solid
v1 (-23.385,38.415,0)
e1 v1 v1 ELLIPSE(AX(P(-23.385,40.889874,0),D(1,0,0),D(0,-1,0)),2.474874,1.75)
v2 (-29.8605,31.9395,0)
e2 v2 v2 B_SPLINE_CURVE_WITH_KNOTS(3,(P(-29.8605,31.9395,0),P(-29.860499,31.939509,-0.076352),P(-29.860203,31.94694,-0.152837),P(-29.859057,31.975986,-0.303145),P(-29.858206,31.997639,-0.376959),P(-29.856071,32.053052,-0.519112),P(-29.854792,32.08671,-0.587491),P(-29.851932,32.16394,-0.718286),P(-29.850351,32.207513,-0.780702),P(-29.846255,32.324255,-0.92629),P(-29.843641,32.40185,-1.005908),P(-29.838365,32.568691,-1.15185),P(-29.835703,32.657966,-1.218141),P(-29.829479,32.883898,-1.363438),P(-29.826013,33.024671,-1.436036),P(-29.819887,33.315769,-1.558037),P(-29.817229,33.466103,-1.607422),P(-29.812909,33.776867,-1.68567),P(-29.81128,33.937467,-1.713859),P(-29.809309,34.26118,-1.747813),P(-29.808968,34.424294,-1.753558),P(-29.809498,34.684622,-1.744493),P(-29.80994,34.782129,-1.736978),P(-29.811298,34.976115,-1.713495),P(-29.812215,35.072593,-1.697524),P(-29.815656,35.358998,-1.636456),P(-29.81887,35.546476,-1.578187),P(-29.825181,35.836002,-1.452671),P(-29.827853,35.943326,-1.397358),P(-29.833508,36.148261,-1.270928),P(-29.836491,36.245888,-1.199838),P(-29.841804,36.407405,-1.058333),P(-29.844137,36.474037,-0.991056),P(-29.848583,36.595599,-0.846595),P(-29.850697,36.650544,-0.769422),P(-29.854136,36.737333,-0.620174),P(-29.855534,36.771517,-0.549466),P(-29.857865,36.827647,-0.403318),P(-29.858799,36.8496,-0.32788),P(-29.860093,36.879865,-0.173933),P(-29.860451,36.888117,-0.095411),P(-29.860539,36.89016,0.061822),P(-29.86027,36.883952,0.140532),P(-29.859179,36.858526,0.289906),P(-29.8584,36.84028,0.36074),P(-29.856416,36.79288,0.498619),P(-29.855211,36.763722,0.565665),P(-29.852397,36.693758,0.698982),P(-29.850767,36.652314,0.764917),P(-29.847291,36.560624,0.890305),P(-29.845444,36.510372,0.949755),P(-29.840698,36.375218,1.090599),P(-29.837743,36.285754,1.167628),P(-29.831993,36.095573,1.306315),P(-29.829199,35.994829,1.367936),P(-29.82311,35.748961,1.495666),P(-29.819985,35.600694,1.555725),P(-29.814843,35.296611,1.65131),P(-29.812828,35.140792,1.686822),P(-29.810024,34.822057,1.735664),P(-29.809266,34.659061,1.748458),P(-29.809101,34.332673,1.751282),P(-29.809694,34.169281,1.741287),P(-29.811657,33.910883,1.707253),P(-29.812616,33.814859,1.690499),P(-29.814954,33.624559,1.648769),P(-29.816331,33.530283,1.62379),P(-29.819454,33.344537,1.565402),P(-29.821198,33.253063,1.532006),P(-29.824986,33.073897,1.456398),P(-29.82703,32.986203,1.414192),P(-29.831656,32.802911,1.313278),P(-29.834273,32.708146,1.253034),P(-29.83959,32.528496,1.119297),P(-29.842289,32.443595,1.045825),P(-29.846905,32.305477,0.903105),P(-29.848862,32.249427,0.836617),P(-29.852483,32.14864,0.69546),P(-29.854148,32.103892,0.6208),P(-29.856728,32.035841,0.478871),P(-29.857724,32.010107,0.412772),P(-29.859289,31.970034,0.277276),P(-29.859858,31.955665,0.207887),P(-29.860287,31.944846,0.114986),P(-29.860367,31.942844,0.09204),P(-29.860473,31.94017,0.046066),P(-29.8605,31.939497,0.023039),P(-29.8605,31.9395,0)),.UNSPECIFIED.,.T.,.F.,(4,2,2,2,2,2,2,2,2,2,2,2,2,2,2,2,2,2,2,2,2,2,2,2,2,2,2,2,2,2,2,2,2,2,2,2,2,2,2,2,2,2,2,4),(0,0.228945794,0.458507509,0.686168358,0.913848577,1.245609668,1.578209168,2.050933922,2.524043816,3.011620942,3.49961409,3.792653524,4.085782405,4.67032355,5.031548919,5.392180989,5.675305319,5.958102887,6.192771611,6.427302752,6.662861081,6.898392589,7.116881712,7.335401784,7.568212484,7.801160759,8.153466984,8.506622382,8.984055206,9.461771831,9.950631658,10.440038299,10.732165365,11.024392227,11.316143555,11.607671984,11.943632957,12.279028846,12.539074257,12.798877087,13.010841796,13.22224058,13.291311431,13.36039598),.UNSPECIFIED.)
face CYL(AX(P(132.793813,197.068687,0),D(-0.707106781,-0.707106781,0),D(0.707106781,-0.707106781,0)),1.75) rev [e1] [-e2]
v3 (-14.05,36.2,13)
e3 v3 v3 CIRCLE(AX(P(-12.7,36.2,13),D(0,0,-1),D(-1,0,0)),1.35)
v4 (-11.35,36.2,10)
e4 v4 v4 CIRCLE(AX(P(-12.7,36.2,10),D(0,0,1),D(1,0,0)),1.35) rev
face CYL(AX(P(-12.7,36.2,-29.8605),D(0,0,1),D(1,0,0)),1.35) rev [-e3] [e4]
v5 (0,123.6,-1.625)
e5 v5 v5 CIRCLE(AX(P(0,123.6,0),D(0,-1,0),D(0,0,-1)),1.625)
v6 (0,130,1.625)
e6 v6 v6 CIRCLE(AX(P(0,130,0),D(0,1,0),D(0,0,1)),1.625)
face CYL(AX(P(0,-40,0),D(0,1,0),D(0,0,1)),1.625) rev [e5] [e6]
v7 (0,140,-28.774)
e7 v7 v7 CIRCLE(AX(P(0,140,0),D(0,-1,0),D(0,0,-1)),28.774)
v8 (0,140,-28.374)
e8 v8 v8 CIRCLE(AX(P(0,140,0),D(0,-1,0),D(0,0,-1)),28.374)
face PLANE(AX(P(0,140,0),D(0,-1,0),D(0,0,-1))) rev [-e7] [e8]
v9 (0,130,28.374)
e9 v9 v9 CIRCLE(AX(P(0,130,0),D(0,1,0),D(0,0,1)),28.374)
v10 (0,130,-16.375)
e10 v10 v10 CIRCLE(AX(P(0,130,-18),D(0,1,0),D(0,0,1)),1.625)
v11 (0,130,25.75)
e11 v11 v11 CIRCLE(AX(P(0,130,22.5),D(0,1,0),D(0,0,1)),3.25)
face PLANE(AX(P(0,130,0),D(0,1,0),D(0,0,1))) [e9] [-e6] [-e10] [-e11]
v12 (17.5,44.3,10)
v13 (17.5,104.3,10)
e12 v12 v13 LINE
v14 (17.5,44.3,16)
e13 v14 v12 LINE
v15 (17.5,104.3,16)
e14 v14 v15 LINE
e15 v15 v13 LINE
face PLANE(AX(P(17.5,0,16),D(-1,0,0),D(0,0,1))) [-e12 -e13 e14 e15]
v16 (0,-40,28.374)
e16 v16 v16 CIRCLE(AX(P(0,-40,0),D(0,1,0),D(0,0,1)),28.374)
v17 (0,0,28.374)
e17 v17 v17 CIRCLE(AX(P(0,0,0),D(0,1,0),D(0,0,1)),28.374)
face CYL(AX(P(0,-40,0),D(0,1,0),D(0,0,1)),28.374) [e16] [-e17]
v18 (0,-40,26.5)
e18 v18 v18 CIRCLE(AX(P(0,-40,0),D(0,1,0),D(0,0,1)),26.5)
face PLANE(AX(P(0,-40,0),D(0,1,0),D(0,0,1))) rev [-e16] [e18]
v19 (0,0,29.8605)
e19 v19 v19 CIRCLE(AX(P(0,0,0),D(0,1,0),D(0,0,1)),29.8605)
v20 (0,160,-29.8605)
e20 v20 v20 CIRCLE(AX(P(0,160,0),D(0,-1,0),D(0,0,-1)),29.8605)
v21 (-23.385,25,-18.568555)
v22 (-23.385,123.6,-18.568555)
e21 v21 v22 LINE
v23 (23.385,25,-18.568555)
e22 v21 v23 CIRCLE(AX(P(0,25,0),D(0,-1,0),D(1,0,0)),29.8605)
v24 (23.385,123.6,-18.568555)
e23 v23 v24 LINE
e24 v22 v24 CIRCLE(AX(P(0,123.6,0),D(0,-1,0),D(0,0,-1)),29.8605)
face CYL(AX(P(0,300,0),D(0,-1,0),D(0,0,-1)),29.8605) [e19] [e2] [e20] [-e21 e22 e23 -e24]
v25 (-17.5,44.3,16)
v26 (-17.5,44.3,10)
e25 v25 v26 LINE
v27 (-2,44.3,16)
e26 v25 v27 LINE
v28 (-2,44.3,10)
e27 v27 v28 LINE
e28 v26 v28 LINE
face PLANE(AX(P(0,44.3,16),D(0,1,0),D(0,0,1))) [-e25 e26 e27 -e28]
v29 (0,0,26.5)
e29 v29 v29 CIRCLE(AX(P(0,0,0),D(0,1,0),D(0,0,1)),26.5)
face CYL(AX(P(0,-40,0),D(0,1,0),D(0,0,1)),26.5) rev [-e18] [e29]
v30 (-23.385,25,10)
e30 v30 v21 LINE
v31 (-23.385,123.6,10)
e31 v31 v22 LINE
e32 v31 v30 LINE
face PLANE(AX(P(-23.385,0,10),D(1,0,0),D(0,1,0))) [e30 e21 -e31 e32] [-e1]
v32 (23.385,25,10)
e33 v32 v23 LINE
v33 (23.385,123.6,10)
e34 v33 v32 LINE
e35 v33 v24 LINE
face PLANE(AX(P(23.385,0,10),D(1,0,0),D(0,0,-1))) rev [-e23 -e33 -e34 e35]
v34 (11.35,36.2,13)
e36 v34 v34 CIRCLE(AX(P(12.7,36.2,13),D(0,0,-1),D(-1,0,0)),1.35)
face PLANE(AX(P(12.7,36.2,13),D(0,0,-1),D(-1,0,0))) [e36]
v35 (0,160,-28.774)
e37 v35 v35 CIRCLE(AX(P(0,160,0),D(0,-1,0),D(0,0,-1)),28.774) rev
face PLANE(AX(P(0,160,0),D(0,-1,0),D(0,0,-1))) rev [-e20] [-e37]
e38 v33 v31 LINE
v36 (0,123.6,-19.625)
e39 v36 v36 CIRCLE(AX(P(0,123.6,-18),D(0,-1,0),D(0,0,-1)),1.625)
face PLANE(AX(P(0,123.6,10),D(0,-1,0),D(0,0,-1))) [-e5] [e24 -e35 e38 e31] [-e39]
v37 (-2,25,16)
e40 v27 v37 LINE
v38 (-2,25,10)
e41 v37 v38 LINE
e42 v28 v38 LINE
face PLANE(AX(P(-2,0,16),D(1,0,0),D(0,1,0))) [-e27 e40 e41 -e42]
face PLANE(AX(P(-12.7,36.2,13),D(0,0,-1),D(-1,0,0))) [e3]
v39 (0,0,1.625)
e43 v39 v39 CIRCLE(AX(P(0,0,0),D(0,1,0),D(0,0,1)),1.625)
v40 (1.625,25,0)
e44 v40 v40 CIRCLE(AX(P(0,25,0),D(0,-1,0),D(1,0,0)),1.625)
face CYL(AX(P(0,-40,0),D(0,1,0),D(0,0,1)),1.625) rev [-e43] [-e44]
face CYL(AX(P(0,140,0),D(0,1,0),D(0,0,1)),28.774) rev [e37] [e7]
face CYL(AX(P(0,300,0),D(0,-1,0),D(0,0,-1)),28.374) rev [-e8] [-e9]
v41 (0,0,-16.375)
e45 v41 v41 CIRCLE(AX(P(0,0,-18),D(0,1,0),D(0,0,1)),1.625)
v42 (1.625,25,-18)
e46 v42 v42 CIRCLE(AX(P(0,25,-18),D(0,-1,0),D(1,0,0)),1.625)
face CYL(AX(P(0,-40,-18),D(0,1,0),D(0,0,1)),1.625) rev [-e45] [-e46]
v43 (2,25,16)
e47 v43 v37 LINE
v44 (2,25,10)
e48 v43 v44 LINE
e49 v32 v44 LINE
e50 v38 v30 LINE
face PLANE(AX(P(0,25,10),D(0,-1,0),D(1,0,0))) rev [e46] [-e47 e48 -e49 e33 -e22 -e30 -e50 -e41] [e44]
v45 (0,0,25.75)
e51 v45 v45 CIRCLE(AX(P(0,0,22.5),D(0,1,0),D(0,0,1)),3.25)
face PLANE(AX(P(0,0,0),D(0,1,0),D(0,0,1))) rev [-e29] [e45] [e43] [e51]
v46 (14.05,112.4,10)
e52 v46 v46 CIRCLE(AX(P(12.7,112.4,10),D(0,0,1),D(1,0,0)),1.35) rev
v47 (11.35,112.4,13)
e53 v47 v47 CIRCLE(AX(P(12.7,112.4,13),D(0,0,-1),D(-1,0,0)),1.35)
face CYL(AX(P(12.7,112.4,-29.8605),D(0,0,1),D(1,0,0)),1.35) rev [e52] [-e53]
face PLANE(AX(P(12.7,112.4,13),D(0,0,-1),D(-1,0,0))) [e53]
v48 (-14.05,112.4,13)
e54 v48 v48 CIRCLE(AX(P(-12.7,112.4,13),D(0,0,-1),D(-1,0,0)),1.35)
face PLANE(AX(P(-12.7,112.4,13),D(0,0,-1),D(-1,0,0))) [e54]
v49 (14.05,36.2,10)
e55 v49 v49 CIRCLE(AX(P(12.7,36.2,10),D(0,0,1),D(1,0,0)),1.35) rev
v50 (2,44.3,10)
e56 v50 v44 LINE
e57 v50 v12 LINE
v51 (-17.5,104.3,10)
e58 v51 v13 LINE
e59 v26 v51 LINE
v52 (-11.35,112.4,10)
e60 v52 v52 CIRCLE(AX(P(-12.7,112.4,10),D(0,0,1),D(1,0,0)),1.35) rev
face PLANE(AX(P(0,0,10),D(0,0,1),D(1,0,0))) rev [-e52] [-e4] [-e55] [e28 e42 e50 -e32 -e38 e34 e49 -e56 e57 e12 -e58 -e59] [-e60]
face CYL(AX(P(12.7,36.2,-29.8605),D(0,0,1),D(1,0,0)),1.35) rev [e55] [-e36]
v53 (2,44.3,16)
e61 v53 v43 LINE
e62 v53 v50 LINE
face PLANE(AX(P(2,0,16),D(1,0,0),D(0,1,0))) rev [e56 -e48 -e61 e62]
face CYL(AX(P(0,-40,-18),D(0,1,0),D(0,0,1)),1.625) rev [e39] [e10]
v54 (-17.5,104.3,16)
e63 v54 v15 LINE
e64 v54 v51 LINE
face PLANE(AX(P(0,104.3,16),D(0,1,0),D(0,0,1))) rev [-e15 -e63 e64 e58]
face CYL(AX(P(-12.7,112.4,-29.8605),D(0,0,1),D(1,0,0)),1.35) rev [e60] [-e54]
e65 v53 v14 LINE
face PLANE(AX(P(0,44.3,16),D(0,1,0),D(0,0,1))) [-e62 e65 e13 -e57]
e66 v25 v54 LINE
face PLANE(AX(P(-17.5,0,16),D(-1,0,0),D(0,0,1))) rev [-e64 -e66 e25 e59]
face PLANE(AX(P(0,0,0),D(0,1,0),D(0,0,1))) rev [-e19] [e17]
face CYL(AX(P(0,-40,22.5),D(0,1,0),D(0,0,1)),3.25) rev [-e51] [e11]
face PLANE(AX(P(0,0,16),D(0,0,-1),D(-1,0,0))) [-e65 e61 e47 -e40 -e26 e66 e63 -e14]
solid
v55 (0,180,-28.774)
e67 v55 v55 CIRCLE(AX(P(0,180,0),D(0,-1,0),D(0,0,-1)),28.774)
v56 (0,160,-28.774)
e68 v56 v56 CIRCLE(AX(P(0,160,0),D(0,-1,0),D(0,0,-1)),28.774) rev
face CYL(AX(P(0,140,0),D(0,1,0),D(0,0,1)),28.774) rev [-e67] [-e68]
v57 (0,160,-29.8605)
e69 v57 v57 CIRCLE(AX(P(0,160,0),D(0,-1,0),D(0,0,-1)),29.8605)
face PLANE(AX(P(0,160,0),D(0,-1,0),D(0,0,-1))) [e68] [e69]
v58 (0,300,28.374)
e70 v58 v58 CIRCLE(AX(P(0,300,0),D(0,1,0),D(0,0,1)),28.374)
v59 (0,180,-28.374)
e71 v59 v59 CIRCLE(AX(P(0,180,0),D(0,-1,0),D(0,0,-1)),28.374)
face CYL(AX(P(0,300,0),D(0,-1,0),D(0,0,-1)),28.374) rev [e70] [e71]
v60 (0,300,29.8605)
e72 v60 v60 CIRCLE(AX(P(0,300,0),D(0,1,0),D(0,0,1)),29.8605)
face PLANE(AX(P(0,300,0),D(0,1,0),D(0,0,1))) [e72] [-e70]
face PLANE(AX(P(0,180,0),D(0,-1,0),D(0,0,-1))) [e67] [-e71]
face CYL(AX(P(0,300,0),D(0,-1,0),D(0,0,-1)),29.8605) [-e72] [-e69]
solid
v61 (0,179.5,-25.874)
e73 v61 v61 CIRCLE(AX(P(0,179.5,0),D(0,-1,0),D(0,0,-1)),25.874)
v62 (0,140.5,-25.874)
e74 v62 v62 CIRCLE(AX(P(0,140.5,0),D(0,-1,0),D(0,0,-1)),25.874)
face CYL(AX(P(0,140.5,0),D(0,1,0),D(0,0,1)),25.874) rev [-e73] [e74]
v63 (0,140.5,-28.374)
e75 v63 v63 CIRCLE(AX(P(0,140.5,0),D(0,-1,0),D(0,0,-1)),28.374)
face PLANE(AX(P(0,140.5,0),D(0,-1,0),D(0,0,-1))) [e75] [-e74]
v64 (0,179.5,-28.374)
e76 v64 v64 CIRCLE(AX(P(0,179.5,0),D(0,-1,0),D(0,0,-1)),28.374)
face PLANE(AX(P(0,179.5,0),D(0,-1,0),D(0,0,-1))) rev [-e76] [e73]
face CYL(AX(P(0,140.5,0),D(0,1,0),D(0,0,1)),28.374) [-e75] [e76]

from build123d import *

# Parameters (mm, degrees)
DIAMETERS_IN_R                        = 29.8605
DIAMETERS_IN_R_2                      = 28.374
RECOVERY_BAY_DEPTH                    = 300
WHAT_OUTLINE_R                        = 28.374
WHAT_DEPTH                            = 130
BOSS_EXTRUDE3_START                   = -40
BOSS_EXTRUDE3_OUTLINE_R               = 28.374
BOSS_EXTRUDE3_OUTLINE_R_2             = 26.5
BOSS_EXTRUDE3_DEPTH                   = 40
CUT_EXTRUDE1_DEPTH                    = 10
CUT_EXTRUDE1_DEPTH_BACK               = 40
WIREPASSTHROUGH1_DEPTH                = 176.166489148
WIREPASSTHROUGH1_DEPTH_BACK           = 176.166489148
SKETCH3_R                             = 3.25
WIREPASSTHROUGH2_DEPTH                = 176.166489148
WIREPASSTHROUGH2_DEPTH_BACK           = 176.166489148
SKETCH5_R                             = 1.625
SKETCH9_W                             = 35
SKETCH9_H                             = 60
SKETCH9_W_2                           = 4
SKETCH9_H_2                           = 19.3
BATTERYPOCKET_DEPTH                   = 6
ATMOSPHERIC_SAMPLING_PORT_REACH       = 304.239
SKETCH10_R                            = 1.75
INCOMPREHENSIBLE7_DEPTH               = 20
INCOMPREHENSIBLE7_DEPTH_BACK          = 20
SKETCH11_R                            = 28.774
SKETCH11_R_2                          = 28.374
SKETCH12_R                            = 28.374
SKETCH12_R_2                          = 25.874
CHUTE_COUPLER_DEPTH                   = 19.5
M3_THREADED_INSERT_POCKETS_DEPTH      = 305.106081712
M3_THREADED_INSERT_POCKETS_DEPTH_BACK = 3
SKETCH15_R                            = 1.35


# Read off the part's stored shape, not the designer's step: what, Boss-Extrude3
with BuildPart() as part:
    # diameters-in → recovery-bay (new body)
    with BuildSketch(Plane(origin=(0, 0, 0), x_dir=(1, 0, 0), z_dir=(0, 1, 0))):
        with Locations(Location((0, 0, 0), (0, 0, 270))):
            Circle(DIAMETERS_IN_R)
        with Locations(Location((0, 0, 0), (0, 0, 270))):
            Circle(DIAMETERS_IN_R_2, mode=Mode.SUBTRACT)
    extrude(amount=RECOVERY_BAY_DEPTH)

    # what outline → what (add)
    with BuildSketch(Plane(origin=(0, 0, 0), x_dir=(1, 0, 0), z_dir=(0, 1, 0))):
        Circle(WHAT_OUTLINE_R)
    extrude(amount=WHAT_DEPTH)

    # Boss-Extrude3 outline → Boss-Extrude3 (add)
    with BuildSketch(Plane(origin=(0, 0, 0), x_dir=(1, 0, 0), z_dir=(0, 1, 0)).offset(BOSS_EXTRUDE3_START)):
        Circle(BOSS_EXTRUDE3_OUTLINE_R)
        Circle(BOSS_EXTRUDE3_OUTLINE_R_2, mode=Mode.SUBTRACT)
    extrude(amount=BOSS_EXTRUDE3_DEPTH)

    # Sketch2 → Cut-Extrude1 (cut, two sides: drawn at the far end of the back side and taken through both)
    with BuildSketch(Plane.XY.offset(-CUT_EXTRUDE1_DEPTH_BACK)):
        Polygon((23.385, 109.475), (23.385, 106.975), (23.385, 41.625), (23.385, 39.125), (23.385, 25), (-23.385, 25), (-23.385, 39.125), (-23.385, 41.625), (-23.385, 106.975), (-23.385, 109.475), (-23.385, 123.6), (23.385, 123.6), align=None)
    extrude(amount=CUT_EXTRUDE1_DEPTH + CUT_EXTRUDE1_DEPTH_BACK, mode=Mode.SUBTRACT)

    # Sketch3 → wirepassthrough1 (cut, two sides: drawn at the far end of the back side and taken through both)
    with BuildSketch(Plane(origin=(0, 130, 0), x_dir=(1, 0, 0), z_dir=(0, 1, 0)).offset(-WIREPASSTHROUGH1_DEPTH_BACK)):
        with Locations(Location((0, -22.5, 0), (0, 0, 270))):
            Circle(SKETCH3_R)
    extrude(amount=WIREPASSTHROUGH1_DEPTH + WIREPASSTHROUGH1_DEPTH_BACK, mode=Mode.SUBTRACT)

    # Sketch5 → wirepassthrough2 (cut, two sides: drawn at the far end of the back side and taken through both)
    with BuildSketch(Plane(origin=(0, 130, 0), x_dir=(1, 0, 0), z_dir=(0, 1, 0)).offset(-WIREPASSTHROUGH2_DEPTH_BACK)):
        with Locations(Location((0, 18, 0), (0, 0, 270))):
            Circle(SKETCH5_R)
        with Locations(Location((0, 0, 0), (0, 0, 270))):
            Circle(SKETCH5_R)
    extrude(amount=WIREPASSTHROUGH2_DEPTH + WIREPASSTHROUGH2_DEPTH_BACK, mode=Mode.SUBTRACT)

    # Sketch9 → batterypocket (cut)
    with BuildSketch(Plane(origin=(0, 0, 10), x_dir=(-1, 0, 0), z_dir=(0, 0, -1))):
        with Locations((0, 74.3)):
            Rectangle(SKETCH9_W, SKETCH9_H)
        with Locations((0, 34.65)):
            Rectangle(SKETCH9_W_2, SKETCH9_H_2)
    extrude(amount=-BATTERYPOCKET_DEPTH, mode=Mode.SUBTRACT)

    # atmospheric-sampling-port: up to this plane
    atmospheric_sampling_port_end = Plane(origin=(-23.385, 0, 10), z_dir=(1, 0, 0))
    # Sketch10 → atmospheric-sampling-port (cut, up to the surface)
    with BuildSketch(Plane(origin=(0.8075, 0.8075, 0), x_dir=(0, 0, -1), z_dir=(0.7071067811865488, 0.7071067811865464, 0)), mode=Mode.PRIVATE) as atmospheric_sampling_port_sk1:
        with Locations(Location((0, 45.449199077, 0), (0, 0, 270))):
            Circle(SKETCH10_R)
    atmospheric_sampling_port_tool1 = split(extrude(atmospheric_sampling_port_sk1.sketch, amount=ATMOSPHERIC_SAMPLING_PORT_REACH, mode=Mode.PRIVATE), bisect_by=atmospheric_sampling_port_end, keep=Keep.BOTH, mode=Mode.PRIVATE)
    add(atmospheric_sampling_port_tool1.solids().sort_by_distance((-31.329937, 32.944937, 0))[0], mode=Mode.SUBTRACT)


with BuildPart() as body_2:
    # Split1: the piece on the far side of the plane
    add(part.part)
    split(bisect_by=Plane(origin=(0, 160, 0), x_dir=(0, 0, -1), z_dir=(0, -1, 0)), keep=Keep.BOTTOM)


with BuildPart() as part_1:
    add(part.part)

    # Split1
    split(bisect_by=Plane(origin=(0, 160, 0), x_dir=(0, 0, -1), z_dir=(0, -1, 0)), keep=Keep.TOP)


with BuildPart() as incomprehensible7_tool:
    # Sketch11 → incomprehensible7 (new, two sides: drawn at the far end of the back side and taken through both)
    with BuildSketch(Plane(origin=(0, 160, 0), x_dir=(-1, 0, 0), z_dir=(0, -1, 0)).offset(-INCOMPREHENSIBLE7_DEPTH_BACK)):
        with Locations(Location((0, 0, 0), (0, 0, 90))):
            Circle(SKETCH11_R)
        with Locations(Location((0, 0, 0), (0, 0, 90))):
            Circle(SKETCH11_R_2, mode=Mode.SUBTRACT)
    extrude(amount=INCOMPREHENSIBLE7_DEPTH + INCOMPREHENSIBLE7_DEPTH_BACK)


with BuildPart() as part_2:
    add(part_1.part)

    # incomprehensible7: cut by incomprehensible7_tool
    add(incomprehensible7_tool.part, mode=Mode.SUBTRACT)

    # Sketch15 → m3-threaded-insert-pockets (cut, two sides: drawn at the far end of the back side and taken through both)
    with BuildSketch(Plane(origin=(0, 0, 10), x_dir=(-1, 0, 0), z_dir=(0, 0, -1)).offset(-M3_THREADED_INSERT_POCKETS_DEPTH_BACK)):
        with Locations(Location((-12.7, 112.4, 0), (0, 0, 180))):
            Circle(SKETCH15_R)
        with Locations(Location((12.7, 112.4, 0), (0, 0, 180))):
            Circle(SKETCH15_R)
        with Locations(Location((-12.7, 36.2, 0), (0, 0, 180))):
            Circle(SKETCH15_R)
        with Locations(Location((12.7, 36.2, 0), (0, 0, 180))):
            Circle(SKETCH15_R)
    extrude(amount=M3_THREADED_INSERT_POCKETS_DEPTH + M3_THREADED_INSERT_POCKETS_DEPTH_BACK, mode=Mode.SUBTRACT)


with BuildPart() as body_2_1:
    add(body_2.part)

    # incomprehensible7: cut by incomprehensible7_tool
    add(incomprehensible7_tool.part, mode=Mode.SUBTRACT)


with BuildPart() as body_3:
    # Sketch12 → chute-coupler (new, symmetric)
    with BuildSketch(Plane(origin=(0, 160, 0), x_dir=(-1, 0, 0), z_dir=(0, -1, 0))):
        with Locations(Location((0, 0, 0), (0, 0, 90))):
            Circle(SKETCH12_R)
        with Locations(Location((0, 0, 0), (0, 0, 90))):
            Circle(SKETCH12_R_2, mode=Mode.SUBTRACT)
    extrude(amount=CHUTE_COUPLER_DEPTH, both=True)


solid = Compound([part_2.part, body_2_1.part, body_3.part])
